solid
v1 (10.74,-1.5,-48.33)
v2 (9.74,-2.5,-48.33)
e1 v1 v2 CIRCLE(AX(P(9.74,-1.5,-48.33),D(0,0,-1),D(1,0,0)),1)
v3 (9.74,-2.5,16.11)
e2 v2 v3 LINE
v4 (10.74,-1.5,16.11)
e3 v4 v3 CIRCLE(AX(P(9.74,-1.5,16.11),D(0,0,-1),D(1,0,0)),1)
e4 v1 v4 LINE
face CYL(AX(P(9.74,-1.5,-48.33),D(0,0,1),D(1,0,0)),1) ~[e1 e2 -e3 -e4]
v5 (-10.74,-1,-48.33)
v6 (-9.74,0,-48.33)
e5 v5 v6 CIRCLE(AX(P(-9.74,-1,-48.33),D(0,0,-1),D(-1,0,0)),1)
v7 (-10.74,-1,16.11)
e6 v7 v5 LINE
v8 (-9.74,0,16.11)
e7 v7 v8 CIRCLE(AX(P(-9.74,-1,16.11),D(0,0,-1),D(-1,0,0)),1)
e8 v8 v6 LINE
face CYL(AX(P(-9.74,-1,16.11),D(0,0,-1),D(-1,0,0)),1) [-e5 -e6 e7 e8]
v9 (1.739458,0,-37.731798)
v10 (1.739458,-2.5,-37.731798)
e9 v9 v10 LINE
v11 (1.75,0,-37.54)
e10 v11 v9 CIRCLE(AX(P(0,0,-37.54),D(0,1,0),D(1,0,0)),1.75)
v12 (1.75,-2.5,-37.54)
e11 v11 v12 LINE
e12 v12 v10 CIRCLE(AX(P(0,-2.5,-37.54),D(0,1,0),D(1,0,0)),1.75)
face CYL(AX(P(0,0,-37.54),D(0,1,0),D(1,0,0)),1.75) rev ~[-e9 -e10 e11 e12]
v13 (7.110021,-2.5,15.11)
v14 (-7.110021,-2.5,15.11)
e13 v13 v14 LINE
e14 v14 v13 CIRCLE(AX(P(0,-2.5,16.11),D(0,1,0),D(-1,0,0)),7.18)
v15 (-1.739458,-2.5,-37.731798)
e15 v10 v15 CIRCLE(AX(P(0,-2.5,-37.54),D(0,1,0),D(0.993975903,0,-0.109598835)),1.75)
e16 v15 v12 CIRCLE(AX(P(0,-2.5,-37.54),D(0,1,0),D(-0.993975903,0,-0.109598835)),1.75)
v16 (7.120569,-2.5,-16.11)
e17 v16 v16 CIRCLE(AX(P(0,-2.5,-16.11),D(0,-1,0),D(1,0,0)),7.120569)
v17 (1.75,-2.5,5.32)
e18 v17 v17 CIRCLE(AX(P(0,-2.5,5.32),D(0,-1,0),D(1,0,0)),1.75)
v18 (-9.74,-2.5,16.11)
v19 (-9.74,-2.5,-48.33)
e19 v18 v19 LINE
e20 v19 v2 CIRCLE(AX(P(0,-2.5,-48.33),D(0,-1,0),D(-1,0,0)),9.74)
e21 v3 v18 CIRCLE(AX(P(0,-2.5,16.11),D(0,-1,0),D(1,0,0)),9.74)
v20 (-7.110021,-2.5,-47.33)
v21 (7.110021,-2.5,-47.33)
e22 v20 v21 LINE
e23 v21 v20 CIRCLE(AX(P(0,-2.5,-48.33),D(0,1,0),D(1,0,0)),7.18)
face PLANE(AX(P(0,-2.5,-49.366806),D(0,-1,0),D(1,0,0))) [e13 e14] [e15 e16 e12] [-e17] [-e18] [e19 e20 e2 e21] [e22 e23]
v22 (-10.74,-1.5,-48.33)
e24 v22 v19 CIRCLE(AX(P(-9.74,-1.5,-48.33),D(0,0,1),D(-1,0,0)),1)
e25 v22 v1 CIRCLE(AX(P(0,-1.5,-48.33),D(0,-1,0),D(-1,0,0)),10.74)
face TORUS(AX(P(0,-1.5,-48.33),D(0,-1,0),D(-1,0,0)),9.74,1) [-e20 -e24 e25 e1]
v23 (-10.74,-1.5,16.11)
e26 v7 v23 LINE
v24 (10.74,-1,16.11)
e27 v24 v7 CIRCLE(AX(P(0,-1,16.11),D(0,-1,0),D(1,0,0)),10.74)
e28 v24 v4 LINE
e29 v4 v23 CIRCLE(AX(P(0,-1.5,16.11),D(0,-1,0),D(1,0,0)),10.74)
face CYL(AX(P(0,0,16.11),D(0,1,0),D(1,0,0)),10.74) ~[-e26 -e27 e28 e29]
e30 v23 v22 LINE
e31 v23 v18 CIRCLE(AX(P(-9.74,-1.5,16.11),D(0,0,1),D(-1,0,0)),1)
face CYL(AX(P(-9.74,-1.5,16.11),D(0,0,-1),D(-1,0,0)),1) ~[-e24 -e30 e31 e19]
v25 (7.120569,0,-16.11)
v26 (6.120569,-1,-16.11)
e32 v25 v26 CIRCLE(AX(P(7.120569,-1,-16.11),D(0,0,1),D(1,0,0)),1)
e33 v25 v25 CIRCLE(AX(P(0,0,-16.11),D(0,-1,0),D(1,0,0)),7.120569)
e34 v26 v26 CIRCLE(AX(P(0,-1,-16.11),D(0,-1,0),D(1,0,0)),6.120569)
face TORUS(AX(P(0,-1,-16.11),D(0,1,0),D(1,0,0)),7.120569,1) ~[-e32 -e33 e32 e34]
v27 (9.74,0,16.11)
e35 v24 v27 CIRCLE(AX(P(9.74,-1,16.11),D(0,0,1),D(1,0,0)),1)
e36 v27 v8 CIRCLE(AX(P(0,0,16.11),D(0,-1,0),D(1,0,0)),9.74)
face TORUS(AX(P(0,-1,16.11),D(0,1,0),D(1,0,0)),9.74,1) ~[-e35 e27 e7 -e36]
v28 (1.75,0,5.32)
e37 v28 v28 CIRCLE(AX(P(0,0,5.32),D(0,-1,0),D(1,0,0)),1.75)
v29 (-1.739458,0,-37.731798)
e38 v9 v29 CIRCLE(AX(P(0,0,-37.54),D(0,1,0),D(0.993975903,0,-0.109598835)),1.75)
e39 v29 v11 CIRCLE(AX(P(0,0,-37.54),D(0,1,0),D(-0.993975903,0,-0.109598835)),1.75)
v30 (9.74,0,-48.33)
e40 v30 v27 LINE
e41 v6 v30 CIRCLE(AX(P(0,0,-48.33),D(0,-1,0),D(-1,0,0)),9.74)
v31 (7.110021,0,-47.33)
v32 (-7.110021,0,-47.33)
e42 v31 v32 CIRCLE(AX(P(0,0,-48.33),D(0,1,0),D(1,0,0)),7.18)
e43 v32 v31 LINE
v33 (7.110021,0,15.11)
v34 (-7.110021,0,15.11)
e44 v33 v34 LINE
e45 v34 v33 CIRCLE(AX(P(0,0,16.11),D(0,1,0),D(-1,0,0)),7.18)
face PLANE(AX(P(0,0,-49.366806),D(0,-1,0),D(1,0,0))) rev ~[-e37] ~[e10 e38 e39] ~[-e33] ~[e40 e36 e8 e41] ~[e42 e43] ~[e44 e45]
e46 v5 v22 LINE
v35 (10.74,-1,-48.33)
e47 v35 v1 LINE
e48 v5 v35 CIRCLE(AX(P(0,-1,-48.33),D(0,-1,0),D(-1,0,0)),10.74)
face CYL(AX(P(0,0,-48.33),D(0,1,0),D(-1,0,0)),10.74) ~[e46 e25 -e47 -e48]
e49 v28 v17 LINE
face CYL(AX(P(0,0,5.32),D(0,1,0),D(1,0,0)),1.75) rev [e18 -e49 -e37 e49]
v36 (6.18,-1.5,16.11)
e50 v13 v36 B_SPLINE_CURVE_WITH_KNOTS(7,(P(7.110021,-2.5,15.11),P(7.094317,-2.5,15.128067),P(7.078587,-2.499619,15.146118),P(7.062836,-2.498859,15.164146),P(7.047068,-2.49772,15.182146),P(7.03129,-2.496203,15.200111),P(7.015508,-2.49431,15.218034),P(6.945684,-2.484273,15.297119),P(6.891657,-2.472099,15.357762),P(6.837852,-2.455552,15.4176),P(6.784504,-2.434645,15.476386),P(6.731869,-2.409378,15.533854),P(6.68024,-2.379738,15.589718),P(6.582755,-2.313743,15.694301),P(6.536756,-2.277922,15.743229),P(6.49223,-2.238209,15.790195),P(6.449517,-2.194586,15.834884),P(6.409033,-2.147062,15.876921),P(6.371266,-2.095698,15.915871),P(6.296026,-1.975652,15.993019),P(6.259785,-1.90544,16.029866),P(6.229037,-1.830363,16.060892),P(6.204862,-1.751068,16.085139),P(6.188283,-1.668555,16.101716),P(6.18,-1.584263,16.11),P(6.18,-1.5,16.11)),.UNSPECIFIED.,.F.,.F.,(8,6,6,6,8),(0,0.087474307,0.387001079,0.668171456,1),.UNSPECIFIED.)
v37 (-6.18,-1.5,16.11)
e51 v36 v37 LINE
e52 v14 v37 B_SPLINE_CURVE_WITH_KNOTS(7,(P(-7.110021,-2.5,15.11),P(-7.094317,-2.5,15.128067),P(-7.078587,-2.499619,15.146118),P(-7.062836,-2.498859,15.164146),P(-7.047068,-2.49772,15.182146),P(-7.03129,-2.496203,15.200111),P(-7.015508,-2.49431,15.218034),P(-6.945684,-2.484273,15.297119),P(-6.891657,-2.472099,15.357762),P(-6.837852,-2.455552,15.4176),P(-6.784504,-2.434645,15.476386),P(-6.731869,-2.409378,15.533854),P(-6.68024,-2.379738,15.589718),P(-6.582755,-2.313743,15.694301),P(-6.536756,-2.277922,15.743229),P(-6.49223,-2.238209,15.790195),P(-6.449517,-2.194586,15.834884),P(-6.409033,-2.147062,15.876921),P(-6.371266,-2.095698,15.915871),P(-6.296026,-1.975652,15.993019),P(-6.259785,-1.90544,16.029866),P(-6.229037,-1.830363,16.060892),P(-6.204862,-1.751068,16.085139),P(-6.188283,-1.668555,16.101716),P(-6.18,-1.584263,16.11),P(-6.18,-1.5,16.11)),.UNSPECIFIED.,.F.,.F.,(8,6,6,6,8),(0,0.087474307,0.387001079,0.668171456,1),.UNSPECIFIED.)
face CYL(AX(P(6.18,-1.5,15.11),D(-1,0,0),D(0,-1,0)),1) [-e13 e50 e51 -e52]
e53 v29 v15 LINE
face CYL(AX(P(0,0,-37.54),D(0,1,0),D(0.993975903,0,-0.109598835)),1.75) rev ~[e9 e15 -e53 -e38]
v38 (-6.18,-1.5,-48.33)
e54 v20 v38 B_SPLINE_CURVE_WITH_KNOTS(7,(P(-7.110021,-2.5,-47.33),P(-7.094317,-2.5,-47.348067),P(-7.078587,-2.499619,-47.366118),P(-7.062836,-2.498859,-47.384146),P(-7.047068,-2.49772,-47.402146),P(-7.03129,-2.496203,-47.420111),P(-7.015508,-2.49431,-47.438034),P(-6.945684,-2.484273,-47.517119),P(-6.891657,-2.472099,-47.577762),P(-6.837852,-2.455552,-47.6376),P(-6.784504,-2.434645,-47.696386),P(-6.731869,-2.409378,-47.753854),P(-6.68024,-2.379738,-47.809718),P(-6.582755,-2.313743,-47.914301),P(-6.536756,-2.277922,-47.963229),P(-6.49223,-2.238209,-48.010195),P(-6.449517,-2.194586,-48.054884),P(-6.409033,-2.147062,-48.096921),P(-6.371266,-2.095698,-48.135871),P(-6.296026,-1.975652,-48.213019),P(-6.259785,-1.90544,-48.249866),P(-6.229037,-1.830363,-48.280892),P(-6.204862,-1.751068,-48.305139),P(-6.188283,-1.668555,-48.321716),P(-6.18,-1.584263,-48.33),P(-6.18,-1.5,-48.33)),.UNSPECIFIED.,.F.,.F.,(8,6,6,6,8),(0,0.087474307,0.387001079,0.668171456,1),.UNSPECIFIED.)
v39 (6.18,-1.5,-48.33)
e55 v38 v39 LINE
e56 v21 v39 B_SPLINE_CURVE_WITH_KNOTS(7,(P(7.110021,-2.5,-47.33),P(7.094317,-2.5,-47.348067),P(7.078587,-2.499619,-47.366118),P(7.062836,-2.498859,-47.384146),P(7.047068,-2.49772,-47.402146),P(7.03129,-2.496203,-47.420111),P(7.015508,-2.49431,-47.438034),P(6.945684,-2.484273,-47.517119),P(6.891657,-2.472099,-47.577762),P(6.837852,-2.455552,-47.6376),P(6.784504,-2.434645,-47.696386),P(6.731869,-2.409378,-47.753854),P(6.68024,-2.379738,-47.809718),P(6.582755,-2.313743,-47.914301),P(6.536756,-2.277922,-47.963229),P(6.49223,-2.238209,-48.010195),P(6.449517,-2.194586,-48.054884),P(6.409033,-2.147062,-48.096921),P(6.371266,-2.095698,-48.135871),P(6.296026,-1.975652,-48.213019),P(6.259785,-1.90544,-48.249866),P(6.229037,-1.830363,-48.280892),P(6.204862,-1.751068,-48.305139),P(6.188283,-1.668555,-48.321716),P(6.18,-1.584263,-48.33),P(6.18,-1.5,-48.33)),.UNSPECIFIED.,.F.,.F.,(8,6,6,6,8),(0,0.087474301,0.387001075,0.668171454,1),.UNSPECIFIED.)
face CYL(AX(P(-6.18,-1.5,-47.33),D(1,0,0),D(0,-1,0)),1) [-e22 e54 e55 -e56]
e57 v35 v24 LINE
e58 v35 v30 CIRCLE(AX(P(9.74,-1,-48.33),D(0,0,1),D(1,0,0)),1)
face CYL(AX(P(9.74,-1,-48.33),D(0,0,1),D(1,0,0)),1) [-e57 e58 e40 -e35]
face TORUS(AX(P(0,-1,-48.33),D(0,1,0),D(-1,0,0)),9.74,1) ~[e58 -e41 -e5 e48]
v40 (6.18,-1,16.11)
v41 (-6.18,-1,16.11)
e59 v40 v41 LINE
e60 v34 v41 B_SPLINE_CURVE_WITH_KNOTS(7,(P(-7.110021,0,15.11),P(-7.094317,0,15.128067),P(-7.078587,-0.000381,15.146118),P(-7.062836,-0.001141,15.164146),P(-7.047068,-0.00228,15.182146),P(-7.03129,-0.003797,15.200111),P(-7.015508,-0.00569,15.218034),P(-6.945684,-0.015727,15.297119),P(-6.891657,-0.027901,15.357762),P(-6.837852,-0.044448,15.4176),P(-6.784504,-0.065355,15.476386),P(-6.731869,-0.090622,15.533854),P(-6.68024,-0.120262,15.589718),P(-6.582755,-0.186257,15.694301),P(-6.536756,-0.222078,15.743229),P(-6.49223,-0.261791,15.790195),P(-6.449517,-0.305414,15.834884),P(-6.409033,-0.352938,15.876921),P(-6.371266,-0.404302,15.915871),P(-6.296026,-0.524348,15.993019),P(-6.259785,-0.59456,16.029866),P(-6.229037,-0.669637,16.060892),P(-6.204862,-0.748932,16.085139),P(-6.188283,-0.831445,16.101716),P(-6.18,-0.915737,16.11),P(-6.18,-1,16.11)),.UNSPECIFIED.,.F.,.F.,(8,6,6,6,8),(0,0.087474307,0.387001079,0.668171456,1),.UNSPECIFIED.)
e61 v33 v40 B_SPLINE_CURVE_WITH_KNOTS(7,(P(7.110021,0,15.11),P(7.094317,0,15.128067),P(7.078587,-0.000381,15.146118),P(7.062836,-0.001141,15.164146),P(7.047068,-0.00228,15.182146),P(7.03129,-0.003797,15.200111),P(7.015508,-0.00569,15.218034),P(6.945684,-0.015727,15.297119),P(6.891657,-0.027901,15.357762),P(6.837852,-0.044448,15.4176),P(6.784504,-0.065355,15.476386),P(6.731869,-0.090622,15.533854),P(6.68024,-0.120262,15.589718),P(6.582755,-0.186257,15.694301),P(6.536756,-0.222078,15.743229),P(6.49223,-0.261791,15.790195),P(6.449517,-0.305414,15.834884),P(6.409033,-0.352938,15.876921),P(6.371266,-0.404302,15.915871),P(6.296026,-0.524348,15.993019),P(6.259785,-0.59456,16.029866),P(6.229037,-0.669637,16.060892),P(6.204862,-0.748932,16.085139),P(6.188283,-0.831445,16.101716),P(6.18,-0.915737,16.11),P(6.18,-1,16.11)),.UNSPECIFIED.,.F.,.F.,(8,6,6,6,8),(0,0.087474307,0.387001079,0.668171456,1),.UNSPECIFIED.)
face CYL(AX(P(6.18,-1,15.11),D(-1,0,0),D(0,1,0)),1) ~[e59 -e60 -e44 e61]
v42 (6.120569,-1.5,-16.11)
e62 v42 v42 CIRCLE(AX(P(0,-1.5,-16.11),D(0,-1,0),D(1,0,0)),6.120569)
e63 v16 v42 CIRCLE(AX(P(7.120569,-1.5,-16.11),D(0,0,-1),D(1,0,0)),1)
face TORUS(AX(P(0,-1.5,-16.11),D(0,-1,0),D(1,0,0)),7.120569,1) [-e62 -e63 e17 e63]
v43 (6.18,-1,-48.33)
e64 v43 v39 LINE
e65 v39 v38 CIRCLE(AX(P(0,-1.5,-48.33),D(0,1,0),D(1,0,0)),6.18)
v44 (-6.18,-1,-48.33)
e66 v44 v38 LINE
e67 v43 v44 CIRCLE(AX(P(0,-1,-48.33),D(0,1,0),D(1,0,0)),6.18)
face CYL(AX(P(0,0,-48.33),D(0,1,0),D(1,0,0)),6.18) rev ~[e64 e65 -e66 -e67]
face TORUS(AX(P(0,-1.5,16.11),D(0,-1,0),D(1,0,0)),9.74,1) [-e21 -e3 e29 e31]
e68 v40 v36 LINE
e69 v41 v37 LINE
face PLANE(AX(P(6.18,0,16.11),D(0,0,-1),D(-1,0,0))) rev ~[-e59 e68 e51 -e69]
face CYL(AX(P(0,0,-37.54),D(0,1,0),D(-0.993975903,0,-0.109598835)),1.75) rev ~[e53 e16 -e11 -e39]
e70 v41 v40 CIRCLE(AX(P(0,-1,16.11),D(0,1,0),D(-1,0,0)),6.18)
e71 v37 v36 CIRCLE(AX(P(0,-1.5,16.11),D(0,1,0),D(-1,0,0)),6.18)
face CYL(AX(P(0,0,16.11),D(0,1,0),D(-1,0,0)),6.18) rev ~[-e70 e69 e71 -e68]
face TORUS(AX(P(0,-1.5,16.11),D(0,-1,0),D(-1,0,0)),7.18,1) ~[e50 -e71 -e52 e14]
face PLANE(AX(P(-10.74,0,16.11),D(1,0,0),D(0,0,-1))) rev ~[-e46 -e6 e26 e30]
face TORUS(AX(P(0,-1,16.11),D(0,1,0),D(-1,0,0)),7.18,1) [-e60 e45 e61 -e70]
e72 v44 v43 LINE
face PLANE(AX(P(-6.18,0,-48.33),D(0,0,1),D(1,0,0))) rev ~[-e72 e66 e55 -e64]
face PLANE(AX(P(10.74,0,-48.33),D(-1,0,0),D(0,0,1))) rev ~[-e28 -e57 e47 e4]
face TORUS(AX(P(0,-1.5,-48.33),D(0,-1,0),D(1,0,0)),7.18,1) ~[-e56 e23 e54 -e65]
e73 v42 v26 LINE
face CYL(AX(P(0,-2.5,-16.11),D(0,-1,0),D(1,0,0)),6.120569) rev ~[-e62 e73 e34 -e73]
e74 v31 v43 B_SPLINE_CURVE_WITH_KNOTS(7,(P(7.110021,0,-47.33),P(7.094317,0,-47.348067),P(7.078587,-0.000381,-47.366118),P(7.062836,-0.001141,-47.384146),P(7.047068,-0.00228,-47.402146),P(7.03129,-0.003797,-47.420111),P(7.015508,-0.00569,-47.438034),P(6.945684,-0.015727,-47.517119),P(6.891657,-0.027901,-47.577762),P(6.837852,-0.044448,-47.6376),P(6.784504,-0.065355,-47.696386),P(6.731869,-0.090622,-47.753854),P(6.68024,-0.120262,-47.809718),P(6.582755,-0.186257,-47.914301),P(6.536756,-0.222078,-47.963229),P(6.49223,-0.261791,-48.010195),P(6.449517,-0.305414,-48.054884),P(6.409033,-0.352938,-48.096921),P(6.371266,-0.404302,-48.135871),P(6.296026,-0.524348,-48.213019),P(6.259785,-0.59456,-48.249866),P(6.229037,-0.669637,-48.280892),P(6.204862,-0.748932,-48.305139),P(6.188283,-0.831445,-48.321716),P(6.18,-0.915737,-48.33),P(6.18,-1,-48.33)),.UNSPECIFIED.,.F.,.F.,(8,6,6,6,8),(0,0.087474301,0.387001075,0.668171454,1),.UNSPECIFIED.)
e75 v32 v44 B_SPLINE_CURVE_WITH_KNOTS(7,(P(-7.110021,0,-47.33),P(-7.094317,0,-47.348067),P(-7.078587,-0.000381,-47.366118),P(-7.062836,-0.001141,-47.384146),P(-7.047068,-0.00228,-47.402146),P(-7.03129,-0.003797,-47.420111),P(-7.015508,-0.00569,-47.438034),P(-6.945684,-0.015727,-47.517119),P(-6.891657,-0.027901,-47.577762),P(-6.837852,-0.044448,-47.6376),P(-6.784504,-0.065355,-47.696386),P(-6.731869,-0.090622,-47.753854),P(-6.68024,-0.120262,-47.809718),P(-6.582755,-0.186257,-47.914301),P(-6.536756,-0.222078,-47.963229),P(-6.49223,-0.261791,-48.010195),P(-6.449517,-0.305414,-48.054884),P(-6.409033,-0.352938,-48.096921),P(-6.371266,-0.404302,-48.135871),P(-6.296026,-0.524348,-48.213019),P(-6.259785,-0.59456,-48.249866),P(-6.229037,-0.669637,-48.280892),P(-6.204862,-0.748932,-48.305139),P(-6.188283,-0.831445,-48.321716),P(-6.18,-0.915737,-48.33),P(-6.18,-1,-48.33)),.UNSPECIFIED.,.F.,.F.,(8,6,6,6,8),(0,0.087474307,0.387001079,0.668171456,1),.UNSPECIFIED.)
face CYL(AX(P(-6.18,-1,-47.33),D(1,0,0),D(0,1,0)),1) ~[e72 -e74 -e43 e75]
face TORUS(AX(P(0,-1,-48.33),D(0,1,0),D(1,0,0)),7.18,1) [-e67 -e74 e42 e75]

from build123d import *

# Parameters (mm, degrees)
F0_W     = 12.36
F0_H     = 4.61
F0_R     = 1
F0_R_2   = 1.75
F1_DEPTH = 2.5
F2_R     = 6.1205689933
F3_DEPTH = 25
F4_R     = 1


# Not quite as in the source:
# - a feature names something its author has since deleted; it is built from what else it names


with BuildPart() as f1:
    # F0 (on Front) → F1 (new body)
    with BuildSketch(Plane.XZ):
        with BuildLine():
            ThreePointArc((10.74, -48.33), (9.5320721777, -43.3815456959), (6.18, -39.5461967235))
            Line((6.18, -39.5461967235), (6.18, -43.72))
            Line((6.18, -43.72), (6.18, -48.33))
            ThreePointArc((6.18, -48.33), (0, -54.51), (-6.18, -48.33))
            Line((-6.18, -48.33), (-6.18, -43.72))
            Line((-6.18, -43.72), (-6.18, -39.5461967235))
            ThreePointArc((-6.18, -39.5461967235), (-9.5320721777, -43.3815456959), (-10.74, -48.33))
            ThreePointArc((-10.74, -48.33), (0, -59.07), (10.74, -48.33))
        make_face()
        with BuildLine():
            Line((6.18, 5.32), (6.18, -11.5))
            Line((6.18, -11.5), (6.18, -16.11))
            Line((6.18, -16.11), (6.18, -20.72))
            Line((6.18, -20.72), (6.18, -37.54))
            Line((6.18, -37.54), (6.18, -39.5461967235))
            ThreePointArc((6.18, -39.5461967235), (9.5320721777, -43.3815456959), (10.74, -48.33))
            Line((10.74, -48.33), (10.74, -18.9998085575))
            Line((10.74, -18.9998085575), (10.74, 16.11))
            ThreePointArc((10.74, 16.11), (0, 26.85), (-10.74, 16.11))
            Line((-10.74, 16.11), (-10.74, -18.9998085575))
            Line((-10.74, -18.9998085575), (-10.74, -48.33))
            ThreePointArc((-10.74, -48.33), (-9.5320721777, -43.3815456959), (-6.18, -39.5461967235))
            Line((-6.18, -39.5461967235), (-6.18, -37.54))
            Line((-6.18, -37.54), (-6.18, -20.72))
            Line((-6.18, -20.72), (-6.18, -16.11))
            Line((-6.18, -16.11), (-6.18, -11.5))
            Line((-6.18, -11.5), (-6.18, 5.32))
            Line((-6.18, 5.32), (-6.18, 11.5))
            Line((-6.18, 11.5), (-6.18, 16.11))
            ThreePointArc((-6.18, 16.11), (0, 22.29), (6.18, 16.11))
            Line((6.18, 16.11), (6.18, 11.5))
            Line((6.18, 11.5), (6.18, 5.32))
        make_face()
        with Locations((0, -13.805)):
            Rectangle(F0_W, F0_H)
        with Locations((0, -13.805)):
            Circle(F0_R, mode=Mode.SUBTRACT)
        with BuildLine():
            Line((-6.18, -11.5), (6.18, -11.5))
            Line((6.18, -11.5), (6.18, 5.32))
            ThreePointArc((6.18, 5.32), (0, -0.86), (-6.18, 5.32))
            Line((-6.18, 5.32), (-6.18, -11.5))
        make_face()
        with BuildLine():
            Line((6.18, -39.5461967235), (6.18, -37.54))
            ThreePointArc((6.18, -37.54), (6.1111223941, -38.4600994968), (5.9060248919, -39.3596895273))
            ThreePointArc((5.9060248919, -39.3596895273), (6.0437319312, -39.451886217), (6.18, -39.5461967235))
        make_face()
        with BuildLine():
            Line((6.18, -37.54), (6.18, -20.72))
            Line((6.18, -20.72), (-6.18, -20.72))
            Line((-6.18, -20.72), (-6.18, -37.54))
            ThreePointArc((-6.18, -37.54), (0, -31.36), (6.18, -37.54))
        make_face()
        with Locations((0, -23.415)):
            Circle(F0_R, mode=Mode.SUBTRACT)
        with BuildLine():
            Line((6.18, -43.72), (6.18, -39.5461967235))
            ThreePointArc((6.18, -39.5461967235), (6.0437319312, -39.451886217), (5.9060248919, -39.3596895273))
            ThreePointArc((5.9060248919, -39.3596895273), (4.8051050355, -41.4263048771), (3.0143614581, -42.935))
            ThreePointArc((3.0143614581, -42.935), (3.5866515341, -43.2972740217), (4.11585957, -43.72))
            Line((4.11585957, -43.72), (6.18, -43.72))
        make_face()
        with BuildLine():
            ThreePointArc((4.11585957, -43.72), (3.5866515341, -43.2972740217), (3.0143614581, -42.935))
            ThreePointArc((3.0143614581, -42.935), (1.5574498387, -43.5205309129), (0, -43.72))
            Line((0, -43.72), (4.11585957, -43.72))
        make_face()
        with BuildLine():
            Line((-6.18, -48.33), (6.18, -48.33))
            ThreePointArc((6.18, -48.33), (5.6404083249, -45.8044913525), (4.11585957, -43.72))
            Line((4.11585957, -43.72), (0, -43.72))
            Line((0, -43.72), (-4.11585957, -43.72))
            ThreePointArc((-4.11585957, -43.72), (-5.6404083249, -45.8044913525), (-6.18, -48.33))
        make_face()
        with Locations((0, -46.025)):
            Circle(F0_R, mode=Mode.SUBTRACT)
        with BuildLine():
            Line((-4.11585957, -43.72), (-6.18, -43.72))
            Line((-6.18, -43.72), (-6.18, -48.33))
            ThreePointArc((-6.18, -48.33), (-5.6404083249, -45.8044913525), (-4.11585957, -43.72))
        make_face()
        with BuildLine():
            Line((6.18, -48.33), (6.18, -43.72))
            Line((6.18, -43.72), (4.11585957, -43.72))
            ThreePointArc((4.11585957, -43.72), (5.6404083249, -45.8044913525), (6.18, -48.33))
        make_face()
        with Locations((0, -18.415)):
            Rectangle(F0_W, F0_H)
        with Locations((0, -46.025)):
            Circle(F0_R)
        with BuildLine():
            ThreePointArc((-5.9060248919, -39.3596895273), (-6.0437319312, -39.451886217), (-6.18, -39.5461967235))
            Line((-6.18, -39.5461967235), (-6.18, -43.72))
            Line((-6.18, -43.72), (-4.11585957, -43.72))
            ThreePointArc((-4.11585957, -43.72), (-3.5866515341, -43.2972740217), (-3.0143614581, -42.935))
            ThreePointArc((-3.0143614581, -42.935), (-4.8051050355, -41.4263048771), (-5.9060248919, -39.3596895273))
        make_face()
        with BuildLine():
            ThreePointArc((0, -43.72), (-1.5574498387, -43.5205309129), (-3.0143614581, -42.935))
            ThreePointArc((-3.0143614581, -42.935), (-3.5866515341, -43.2972740217), (-4.11585957, -43.72))
            Line((-4.11585957, -43.72), (0, -43.72))
        make_face()
        with BuildLine():
            ThreePointArc((5.9060248919, -39.3596895273), (6.1111223941, -38.4600994968), (6.18, -37.54))
            ThreePointArc((6.18, -37.54), (0, -31.36), (-6.18, -37.54))
            ThreePointArc((-6.18, -37.54), (-6.1111223941, -38.4600994968), (-5.9060248919, -39.3596895273))
            ThreePointArc((-5.9060248919, -39.3596895273), (-3.9084343733, -38.3264136056), (-1.7394578299, -37.7317979611))
            ThreePointArc((-1.7394578299, -37.7317979611), (-0.0960437338, -35.7926375301), (1.75, -37.54))
            ThreePointArc((1.75, -37.54), (1.7473624699, -37.6360437338), (1.7394578299, -37.7317979611))
            ThreePointArc((1.7394578299, -37.7317979611), (3.9084343733, -38.3264136056), (5.9060248919, -39.3596895273))
        make_face()
        with BuildLine():
            ThreePointArc((3.0143614581, -42.935), (4.8051050355, -41.4263048771), (5.9060248919, -39.3596895273))
            ThreePointArc((5.9060248919, -39.3596895273), (3.9084343733, -38.3264136056), (1.7394578299, -37.7317979611))
            ThreePointArc((1.7394578299, -37.7317979611), (0, -39.29), (-1.7394578299, -37.7317979611))
            ThreePointArc((-1.7394578299, -37.7317979611), (-3.9084343733, -38.3264136056), (-5.9060248919, -39.3596895273))
            ThreePointArc((-5.9060248919, -39.3596895273), (-4.8051050355, -41.4263048771), (-3.0143614581, -42.935))
            ThreePointArc((-3.0143614581, -42.935), (0, -42.15), (3.0143614581, -42.935))
        make_face()
        with BuildLine():
            ThreePointArc((0, -43.72), (1.5574498387, -43.5205309129), (3.0143614581, -42.935))
            ThreePointArc((3.0143614581, -42.935), (0, -42.15), (-3.0143614581, -42.935))
            ThreePointArc((-3.0143614581, -42.935), (-1.5574498387, -43.5205309129), (0, -43.72))
        make_face()
        with BuildLine():
            ThreePointArc((-5.9060248919, -39.3596895273), (-6.1111223941, -38.4600994968), (-6.18, -37.54))
            Line((-6.18, -37.54), (-6.18, -39.5461967235))
            ThreePointArc((-6.18, -39.5461967235), (-6.0437319312, -39.451886217), (-5.9060248919, -39.3596895273))
        make_face()
        with BuildLine():
            ThreePointArc((-6.18, 5.32), (0, -0.86), (6.18, 5.32))
            ThreePointArc((6.18, 5.32), (4.3699199077, 9.6899199077), (0, 11.5))
            ThreePointArc((0, 11.5), (-4.3699199077, 9.6899199077), (-6.18, 5.32))
        make_face()
        with Locations((0, 5.32)):
            Circle(F0_R_2, mode=Mode.SUBTRACT)
        with BuildLine():
            Line((-6.18, 11.5), (-6.18, 5.32))
            ThreePointArc((-6.18, 5.32), (-4.3699199077, 9.6899199077), (0, 11.5))
            Line((0, 11.5), (-6.18, 11.5))
        make_face()
        Polygon((0, 11.5), (6.18, 11.5), (6.18, 16.11), (-6.18, 16.11), (-6.18, 11.5), align=None)
        with Locations((0, 13.805)):
            Circle(F0_R, mode=Mode.SUBTRACT)
        with BuildLine():
            ThreePointArc((0, 11.5), (4.3699199077, 9.6899199077), (6.18, 5.32))
            Line((6.18, 5.32), (6.18, 11.5))
            Line((6.18, 11.5), (0, 11.5))
        make_face()
        with Locations((0, 13.805)):
            Circle(F0_R)
        with Locations((0, -13.805)):
            Circle(F0_R)
        with Locations((0, -23.415)):
            Circle(F0_R)
    extrude(amount=F1_DEPTH)

    # F2 (on face) → F3 (cut)
    with BuildSketch(Plane.XZ.offset(2.5)):
        with Locations((0, -16.11)):
            Circle(F2_R)
    extrude(amount=-F3_DEPTH, mode=Mode.SUBTRACT)

    # F4
    f4_edges = [f1.edges().sort_by_distance(p)[0] for p in [
        (10.74, -2.5, -16.11),
        (0, -2.5, 26.85),
        (-6.120569, -2.5, -16.11),
        (0, -2.5, 16.11),
        (0, -2.5, 22.29),
        (0, -2.5, -48.33),
        (0, -2.5, -54.51),
        (-10.74, 0, -16.11),
        (0, 0, -54.51),
        (0, 0, -48.33),
        (0, 0, 22.29),
        (0, 0, 16.11),
        (-6.120569, 0, -16.11),
    ]]
    fillet(f4_edges, radius=F4_R)


solid = f1.part
